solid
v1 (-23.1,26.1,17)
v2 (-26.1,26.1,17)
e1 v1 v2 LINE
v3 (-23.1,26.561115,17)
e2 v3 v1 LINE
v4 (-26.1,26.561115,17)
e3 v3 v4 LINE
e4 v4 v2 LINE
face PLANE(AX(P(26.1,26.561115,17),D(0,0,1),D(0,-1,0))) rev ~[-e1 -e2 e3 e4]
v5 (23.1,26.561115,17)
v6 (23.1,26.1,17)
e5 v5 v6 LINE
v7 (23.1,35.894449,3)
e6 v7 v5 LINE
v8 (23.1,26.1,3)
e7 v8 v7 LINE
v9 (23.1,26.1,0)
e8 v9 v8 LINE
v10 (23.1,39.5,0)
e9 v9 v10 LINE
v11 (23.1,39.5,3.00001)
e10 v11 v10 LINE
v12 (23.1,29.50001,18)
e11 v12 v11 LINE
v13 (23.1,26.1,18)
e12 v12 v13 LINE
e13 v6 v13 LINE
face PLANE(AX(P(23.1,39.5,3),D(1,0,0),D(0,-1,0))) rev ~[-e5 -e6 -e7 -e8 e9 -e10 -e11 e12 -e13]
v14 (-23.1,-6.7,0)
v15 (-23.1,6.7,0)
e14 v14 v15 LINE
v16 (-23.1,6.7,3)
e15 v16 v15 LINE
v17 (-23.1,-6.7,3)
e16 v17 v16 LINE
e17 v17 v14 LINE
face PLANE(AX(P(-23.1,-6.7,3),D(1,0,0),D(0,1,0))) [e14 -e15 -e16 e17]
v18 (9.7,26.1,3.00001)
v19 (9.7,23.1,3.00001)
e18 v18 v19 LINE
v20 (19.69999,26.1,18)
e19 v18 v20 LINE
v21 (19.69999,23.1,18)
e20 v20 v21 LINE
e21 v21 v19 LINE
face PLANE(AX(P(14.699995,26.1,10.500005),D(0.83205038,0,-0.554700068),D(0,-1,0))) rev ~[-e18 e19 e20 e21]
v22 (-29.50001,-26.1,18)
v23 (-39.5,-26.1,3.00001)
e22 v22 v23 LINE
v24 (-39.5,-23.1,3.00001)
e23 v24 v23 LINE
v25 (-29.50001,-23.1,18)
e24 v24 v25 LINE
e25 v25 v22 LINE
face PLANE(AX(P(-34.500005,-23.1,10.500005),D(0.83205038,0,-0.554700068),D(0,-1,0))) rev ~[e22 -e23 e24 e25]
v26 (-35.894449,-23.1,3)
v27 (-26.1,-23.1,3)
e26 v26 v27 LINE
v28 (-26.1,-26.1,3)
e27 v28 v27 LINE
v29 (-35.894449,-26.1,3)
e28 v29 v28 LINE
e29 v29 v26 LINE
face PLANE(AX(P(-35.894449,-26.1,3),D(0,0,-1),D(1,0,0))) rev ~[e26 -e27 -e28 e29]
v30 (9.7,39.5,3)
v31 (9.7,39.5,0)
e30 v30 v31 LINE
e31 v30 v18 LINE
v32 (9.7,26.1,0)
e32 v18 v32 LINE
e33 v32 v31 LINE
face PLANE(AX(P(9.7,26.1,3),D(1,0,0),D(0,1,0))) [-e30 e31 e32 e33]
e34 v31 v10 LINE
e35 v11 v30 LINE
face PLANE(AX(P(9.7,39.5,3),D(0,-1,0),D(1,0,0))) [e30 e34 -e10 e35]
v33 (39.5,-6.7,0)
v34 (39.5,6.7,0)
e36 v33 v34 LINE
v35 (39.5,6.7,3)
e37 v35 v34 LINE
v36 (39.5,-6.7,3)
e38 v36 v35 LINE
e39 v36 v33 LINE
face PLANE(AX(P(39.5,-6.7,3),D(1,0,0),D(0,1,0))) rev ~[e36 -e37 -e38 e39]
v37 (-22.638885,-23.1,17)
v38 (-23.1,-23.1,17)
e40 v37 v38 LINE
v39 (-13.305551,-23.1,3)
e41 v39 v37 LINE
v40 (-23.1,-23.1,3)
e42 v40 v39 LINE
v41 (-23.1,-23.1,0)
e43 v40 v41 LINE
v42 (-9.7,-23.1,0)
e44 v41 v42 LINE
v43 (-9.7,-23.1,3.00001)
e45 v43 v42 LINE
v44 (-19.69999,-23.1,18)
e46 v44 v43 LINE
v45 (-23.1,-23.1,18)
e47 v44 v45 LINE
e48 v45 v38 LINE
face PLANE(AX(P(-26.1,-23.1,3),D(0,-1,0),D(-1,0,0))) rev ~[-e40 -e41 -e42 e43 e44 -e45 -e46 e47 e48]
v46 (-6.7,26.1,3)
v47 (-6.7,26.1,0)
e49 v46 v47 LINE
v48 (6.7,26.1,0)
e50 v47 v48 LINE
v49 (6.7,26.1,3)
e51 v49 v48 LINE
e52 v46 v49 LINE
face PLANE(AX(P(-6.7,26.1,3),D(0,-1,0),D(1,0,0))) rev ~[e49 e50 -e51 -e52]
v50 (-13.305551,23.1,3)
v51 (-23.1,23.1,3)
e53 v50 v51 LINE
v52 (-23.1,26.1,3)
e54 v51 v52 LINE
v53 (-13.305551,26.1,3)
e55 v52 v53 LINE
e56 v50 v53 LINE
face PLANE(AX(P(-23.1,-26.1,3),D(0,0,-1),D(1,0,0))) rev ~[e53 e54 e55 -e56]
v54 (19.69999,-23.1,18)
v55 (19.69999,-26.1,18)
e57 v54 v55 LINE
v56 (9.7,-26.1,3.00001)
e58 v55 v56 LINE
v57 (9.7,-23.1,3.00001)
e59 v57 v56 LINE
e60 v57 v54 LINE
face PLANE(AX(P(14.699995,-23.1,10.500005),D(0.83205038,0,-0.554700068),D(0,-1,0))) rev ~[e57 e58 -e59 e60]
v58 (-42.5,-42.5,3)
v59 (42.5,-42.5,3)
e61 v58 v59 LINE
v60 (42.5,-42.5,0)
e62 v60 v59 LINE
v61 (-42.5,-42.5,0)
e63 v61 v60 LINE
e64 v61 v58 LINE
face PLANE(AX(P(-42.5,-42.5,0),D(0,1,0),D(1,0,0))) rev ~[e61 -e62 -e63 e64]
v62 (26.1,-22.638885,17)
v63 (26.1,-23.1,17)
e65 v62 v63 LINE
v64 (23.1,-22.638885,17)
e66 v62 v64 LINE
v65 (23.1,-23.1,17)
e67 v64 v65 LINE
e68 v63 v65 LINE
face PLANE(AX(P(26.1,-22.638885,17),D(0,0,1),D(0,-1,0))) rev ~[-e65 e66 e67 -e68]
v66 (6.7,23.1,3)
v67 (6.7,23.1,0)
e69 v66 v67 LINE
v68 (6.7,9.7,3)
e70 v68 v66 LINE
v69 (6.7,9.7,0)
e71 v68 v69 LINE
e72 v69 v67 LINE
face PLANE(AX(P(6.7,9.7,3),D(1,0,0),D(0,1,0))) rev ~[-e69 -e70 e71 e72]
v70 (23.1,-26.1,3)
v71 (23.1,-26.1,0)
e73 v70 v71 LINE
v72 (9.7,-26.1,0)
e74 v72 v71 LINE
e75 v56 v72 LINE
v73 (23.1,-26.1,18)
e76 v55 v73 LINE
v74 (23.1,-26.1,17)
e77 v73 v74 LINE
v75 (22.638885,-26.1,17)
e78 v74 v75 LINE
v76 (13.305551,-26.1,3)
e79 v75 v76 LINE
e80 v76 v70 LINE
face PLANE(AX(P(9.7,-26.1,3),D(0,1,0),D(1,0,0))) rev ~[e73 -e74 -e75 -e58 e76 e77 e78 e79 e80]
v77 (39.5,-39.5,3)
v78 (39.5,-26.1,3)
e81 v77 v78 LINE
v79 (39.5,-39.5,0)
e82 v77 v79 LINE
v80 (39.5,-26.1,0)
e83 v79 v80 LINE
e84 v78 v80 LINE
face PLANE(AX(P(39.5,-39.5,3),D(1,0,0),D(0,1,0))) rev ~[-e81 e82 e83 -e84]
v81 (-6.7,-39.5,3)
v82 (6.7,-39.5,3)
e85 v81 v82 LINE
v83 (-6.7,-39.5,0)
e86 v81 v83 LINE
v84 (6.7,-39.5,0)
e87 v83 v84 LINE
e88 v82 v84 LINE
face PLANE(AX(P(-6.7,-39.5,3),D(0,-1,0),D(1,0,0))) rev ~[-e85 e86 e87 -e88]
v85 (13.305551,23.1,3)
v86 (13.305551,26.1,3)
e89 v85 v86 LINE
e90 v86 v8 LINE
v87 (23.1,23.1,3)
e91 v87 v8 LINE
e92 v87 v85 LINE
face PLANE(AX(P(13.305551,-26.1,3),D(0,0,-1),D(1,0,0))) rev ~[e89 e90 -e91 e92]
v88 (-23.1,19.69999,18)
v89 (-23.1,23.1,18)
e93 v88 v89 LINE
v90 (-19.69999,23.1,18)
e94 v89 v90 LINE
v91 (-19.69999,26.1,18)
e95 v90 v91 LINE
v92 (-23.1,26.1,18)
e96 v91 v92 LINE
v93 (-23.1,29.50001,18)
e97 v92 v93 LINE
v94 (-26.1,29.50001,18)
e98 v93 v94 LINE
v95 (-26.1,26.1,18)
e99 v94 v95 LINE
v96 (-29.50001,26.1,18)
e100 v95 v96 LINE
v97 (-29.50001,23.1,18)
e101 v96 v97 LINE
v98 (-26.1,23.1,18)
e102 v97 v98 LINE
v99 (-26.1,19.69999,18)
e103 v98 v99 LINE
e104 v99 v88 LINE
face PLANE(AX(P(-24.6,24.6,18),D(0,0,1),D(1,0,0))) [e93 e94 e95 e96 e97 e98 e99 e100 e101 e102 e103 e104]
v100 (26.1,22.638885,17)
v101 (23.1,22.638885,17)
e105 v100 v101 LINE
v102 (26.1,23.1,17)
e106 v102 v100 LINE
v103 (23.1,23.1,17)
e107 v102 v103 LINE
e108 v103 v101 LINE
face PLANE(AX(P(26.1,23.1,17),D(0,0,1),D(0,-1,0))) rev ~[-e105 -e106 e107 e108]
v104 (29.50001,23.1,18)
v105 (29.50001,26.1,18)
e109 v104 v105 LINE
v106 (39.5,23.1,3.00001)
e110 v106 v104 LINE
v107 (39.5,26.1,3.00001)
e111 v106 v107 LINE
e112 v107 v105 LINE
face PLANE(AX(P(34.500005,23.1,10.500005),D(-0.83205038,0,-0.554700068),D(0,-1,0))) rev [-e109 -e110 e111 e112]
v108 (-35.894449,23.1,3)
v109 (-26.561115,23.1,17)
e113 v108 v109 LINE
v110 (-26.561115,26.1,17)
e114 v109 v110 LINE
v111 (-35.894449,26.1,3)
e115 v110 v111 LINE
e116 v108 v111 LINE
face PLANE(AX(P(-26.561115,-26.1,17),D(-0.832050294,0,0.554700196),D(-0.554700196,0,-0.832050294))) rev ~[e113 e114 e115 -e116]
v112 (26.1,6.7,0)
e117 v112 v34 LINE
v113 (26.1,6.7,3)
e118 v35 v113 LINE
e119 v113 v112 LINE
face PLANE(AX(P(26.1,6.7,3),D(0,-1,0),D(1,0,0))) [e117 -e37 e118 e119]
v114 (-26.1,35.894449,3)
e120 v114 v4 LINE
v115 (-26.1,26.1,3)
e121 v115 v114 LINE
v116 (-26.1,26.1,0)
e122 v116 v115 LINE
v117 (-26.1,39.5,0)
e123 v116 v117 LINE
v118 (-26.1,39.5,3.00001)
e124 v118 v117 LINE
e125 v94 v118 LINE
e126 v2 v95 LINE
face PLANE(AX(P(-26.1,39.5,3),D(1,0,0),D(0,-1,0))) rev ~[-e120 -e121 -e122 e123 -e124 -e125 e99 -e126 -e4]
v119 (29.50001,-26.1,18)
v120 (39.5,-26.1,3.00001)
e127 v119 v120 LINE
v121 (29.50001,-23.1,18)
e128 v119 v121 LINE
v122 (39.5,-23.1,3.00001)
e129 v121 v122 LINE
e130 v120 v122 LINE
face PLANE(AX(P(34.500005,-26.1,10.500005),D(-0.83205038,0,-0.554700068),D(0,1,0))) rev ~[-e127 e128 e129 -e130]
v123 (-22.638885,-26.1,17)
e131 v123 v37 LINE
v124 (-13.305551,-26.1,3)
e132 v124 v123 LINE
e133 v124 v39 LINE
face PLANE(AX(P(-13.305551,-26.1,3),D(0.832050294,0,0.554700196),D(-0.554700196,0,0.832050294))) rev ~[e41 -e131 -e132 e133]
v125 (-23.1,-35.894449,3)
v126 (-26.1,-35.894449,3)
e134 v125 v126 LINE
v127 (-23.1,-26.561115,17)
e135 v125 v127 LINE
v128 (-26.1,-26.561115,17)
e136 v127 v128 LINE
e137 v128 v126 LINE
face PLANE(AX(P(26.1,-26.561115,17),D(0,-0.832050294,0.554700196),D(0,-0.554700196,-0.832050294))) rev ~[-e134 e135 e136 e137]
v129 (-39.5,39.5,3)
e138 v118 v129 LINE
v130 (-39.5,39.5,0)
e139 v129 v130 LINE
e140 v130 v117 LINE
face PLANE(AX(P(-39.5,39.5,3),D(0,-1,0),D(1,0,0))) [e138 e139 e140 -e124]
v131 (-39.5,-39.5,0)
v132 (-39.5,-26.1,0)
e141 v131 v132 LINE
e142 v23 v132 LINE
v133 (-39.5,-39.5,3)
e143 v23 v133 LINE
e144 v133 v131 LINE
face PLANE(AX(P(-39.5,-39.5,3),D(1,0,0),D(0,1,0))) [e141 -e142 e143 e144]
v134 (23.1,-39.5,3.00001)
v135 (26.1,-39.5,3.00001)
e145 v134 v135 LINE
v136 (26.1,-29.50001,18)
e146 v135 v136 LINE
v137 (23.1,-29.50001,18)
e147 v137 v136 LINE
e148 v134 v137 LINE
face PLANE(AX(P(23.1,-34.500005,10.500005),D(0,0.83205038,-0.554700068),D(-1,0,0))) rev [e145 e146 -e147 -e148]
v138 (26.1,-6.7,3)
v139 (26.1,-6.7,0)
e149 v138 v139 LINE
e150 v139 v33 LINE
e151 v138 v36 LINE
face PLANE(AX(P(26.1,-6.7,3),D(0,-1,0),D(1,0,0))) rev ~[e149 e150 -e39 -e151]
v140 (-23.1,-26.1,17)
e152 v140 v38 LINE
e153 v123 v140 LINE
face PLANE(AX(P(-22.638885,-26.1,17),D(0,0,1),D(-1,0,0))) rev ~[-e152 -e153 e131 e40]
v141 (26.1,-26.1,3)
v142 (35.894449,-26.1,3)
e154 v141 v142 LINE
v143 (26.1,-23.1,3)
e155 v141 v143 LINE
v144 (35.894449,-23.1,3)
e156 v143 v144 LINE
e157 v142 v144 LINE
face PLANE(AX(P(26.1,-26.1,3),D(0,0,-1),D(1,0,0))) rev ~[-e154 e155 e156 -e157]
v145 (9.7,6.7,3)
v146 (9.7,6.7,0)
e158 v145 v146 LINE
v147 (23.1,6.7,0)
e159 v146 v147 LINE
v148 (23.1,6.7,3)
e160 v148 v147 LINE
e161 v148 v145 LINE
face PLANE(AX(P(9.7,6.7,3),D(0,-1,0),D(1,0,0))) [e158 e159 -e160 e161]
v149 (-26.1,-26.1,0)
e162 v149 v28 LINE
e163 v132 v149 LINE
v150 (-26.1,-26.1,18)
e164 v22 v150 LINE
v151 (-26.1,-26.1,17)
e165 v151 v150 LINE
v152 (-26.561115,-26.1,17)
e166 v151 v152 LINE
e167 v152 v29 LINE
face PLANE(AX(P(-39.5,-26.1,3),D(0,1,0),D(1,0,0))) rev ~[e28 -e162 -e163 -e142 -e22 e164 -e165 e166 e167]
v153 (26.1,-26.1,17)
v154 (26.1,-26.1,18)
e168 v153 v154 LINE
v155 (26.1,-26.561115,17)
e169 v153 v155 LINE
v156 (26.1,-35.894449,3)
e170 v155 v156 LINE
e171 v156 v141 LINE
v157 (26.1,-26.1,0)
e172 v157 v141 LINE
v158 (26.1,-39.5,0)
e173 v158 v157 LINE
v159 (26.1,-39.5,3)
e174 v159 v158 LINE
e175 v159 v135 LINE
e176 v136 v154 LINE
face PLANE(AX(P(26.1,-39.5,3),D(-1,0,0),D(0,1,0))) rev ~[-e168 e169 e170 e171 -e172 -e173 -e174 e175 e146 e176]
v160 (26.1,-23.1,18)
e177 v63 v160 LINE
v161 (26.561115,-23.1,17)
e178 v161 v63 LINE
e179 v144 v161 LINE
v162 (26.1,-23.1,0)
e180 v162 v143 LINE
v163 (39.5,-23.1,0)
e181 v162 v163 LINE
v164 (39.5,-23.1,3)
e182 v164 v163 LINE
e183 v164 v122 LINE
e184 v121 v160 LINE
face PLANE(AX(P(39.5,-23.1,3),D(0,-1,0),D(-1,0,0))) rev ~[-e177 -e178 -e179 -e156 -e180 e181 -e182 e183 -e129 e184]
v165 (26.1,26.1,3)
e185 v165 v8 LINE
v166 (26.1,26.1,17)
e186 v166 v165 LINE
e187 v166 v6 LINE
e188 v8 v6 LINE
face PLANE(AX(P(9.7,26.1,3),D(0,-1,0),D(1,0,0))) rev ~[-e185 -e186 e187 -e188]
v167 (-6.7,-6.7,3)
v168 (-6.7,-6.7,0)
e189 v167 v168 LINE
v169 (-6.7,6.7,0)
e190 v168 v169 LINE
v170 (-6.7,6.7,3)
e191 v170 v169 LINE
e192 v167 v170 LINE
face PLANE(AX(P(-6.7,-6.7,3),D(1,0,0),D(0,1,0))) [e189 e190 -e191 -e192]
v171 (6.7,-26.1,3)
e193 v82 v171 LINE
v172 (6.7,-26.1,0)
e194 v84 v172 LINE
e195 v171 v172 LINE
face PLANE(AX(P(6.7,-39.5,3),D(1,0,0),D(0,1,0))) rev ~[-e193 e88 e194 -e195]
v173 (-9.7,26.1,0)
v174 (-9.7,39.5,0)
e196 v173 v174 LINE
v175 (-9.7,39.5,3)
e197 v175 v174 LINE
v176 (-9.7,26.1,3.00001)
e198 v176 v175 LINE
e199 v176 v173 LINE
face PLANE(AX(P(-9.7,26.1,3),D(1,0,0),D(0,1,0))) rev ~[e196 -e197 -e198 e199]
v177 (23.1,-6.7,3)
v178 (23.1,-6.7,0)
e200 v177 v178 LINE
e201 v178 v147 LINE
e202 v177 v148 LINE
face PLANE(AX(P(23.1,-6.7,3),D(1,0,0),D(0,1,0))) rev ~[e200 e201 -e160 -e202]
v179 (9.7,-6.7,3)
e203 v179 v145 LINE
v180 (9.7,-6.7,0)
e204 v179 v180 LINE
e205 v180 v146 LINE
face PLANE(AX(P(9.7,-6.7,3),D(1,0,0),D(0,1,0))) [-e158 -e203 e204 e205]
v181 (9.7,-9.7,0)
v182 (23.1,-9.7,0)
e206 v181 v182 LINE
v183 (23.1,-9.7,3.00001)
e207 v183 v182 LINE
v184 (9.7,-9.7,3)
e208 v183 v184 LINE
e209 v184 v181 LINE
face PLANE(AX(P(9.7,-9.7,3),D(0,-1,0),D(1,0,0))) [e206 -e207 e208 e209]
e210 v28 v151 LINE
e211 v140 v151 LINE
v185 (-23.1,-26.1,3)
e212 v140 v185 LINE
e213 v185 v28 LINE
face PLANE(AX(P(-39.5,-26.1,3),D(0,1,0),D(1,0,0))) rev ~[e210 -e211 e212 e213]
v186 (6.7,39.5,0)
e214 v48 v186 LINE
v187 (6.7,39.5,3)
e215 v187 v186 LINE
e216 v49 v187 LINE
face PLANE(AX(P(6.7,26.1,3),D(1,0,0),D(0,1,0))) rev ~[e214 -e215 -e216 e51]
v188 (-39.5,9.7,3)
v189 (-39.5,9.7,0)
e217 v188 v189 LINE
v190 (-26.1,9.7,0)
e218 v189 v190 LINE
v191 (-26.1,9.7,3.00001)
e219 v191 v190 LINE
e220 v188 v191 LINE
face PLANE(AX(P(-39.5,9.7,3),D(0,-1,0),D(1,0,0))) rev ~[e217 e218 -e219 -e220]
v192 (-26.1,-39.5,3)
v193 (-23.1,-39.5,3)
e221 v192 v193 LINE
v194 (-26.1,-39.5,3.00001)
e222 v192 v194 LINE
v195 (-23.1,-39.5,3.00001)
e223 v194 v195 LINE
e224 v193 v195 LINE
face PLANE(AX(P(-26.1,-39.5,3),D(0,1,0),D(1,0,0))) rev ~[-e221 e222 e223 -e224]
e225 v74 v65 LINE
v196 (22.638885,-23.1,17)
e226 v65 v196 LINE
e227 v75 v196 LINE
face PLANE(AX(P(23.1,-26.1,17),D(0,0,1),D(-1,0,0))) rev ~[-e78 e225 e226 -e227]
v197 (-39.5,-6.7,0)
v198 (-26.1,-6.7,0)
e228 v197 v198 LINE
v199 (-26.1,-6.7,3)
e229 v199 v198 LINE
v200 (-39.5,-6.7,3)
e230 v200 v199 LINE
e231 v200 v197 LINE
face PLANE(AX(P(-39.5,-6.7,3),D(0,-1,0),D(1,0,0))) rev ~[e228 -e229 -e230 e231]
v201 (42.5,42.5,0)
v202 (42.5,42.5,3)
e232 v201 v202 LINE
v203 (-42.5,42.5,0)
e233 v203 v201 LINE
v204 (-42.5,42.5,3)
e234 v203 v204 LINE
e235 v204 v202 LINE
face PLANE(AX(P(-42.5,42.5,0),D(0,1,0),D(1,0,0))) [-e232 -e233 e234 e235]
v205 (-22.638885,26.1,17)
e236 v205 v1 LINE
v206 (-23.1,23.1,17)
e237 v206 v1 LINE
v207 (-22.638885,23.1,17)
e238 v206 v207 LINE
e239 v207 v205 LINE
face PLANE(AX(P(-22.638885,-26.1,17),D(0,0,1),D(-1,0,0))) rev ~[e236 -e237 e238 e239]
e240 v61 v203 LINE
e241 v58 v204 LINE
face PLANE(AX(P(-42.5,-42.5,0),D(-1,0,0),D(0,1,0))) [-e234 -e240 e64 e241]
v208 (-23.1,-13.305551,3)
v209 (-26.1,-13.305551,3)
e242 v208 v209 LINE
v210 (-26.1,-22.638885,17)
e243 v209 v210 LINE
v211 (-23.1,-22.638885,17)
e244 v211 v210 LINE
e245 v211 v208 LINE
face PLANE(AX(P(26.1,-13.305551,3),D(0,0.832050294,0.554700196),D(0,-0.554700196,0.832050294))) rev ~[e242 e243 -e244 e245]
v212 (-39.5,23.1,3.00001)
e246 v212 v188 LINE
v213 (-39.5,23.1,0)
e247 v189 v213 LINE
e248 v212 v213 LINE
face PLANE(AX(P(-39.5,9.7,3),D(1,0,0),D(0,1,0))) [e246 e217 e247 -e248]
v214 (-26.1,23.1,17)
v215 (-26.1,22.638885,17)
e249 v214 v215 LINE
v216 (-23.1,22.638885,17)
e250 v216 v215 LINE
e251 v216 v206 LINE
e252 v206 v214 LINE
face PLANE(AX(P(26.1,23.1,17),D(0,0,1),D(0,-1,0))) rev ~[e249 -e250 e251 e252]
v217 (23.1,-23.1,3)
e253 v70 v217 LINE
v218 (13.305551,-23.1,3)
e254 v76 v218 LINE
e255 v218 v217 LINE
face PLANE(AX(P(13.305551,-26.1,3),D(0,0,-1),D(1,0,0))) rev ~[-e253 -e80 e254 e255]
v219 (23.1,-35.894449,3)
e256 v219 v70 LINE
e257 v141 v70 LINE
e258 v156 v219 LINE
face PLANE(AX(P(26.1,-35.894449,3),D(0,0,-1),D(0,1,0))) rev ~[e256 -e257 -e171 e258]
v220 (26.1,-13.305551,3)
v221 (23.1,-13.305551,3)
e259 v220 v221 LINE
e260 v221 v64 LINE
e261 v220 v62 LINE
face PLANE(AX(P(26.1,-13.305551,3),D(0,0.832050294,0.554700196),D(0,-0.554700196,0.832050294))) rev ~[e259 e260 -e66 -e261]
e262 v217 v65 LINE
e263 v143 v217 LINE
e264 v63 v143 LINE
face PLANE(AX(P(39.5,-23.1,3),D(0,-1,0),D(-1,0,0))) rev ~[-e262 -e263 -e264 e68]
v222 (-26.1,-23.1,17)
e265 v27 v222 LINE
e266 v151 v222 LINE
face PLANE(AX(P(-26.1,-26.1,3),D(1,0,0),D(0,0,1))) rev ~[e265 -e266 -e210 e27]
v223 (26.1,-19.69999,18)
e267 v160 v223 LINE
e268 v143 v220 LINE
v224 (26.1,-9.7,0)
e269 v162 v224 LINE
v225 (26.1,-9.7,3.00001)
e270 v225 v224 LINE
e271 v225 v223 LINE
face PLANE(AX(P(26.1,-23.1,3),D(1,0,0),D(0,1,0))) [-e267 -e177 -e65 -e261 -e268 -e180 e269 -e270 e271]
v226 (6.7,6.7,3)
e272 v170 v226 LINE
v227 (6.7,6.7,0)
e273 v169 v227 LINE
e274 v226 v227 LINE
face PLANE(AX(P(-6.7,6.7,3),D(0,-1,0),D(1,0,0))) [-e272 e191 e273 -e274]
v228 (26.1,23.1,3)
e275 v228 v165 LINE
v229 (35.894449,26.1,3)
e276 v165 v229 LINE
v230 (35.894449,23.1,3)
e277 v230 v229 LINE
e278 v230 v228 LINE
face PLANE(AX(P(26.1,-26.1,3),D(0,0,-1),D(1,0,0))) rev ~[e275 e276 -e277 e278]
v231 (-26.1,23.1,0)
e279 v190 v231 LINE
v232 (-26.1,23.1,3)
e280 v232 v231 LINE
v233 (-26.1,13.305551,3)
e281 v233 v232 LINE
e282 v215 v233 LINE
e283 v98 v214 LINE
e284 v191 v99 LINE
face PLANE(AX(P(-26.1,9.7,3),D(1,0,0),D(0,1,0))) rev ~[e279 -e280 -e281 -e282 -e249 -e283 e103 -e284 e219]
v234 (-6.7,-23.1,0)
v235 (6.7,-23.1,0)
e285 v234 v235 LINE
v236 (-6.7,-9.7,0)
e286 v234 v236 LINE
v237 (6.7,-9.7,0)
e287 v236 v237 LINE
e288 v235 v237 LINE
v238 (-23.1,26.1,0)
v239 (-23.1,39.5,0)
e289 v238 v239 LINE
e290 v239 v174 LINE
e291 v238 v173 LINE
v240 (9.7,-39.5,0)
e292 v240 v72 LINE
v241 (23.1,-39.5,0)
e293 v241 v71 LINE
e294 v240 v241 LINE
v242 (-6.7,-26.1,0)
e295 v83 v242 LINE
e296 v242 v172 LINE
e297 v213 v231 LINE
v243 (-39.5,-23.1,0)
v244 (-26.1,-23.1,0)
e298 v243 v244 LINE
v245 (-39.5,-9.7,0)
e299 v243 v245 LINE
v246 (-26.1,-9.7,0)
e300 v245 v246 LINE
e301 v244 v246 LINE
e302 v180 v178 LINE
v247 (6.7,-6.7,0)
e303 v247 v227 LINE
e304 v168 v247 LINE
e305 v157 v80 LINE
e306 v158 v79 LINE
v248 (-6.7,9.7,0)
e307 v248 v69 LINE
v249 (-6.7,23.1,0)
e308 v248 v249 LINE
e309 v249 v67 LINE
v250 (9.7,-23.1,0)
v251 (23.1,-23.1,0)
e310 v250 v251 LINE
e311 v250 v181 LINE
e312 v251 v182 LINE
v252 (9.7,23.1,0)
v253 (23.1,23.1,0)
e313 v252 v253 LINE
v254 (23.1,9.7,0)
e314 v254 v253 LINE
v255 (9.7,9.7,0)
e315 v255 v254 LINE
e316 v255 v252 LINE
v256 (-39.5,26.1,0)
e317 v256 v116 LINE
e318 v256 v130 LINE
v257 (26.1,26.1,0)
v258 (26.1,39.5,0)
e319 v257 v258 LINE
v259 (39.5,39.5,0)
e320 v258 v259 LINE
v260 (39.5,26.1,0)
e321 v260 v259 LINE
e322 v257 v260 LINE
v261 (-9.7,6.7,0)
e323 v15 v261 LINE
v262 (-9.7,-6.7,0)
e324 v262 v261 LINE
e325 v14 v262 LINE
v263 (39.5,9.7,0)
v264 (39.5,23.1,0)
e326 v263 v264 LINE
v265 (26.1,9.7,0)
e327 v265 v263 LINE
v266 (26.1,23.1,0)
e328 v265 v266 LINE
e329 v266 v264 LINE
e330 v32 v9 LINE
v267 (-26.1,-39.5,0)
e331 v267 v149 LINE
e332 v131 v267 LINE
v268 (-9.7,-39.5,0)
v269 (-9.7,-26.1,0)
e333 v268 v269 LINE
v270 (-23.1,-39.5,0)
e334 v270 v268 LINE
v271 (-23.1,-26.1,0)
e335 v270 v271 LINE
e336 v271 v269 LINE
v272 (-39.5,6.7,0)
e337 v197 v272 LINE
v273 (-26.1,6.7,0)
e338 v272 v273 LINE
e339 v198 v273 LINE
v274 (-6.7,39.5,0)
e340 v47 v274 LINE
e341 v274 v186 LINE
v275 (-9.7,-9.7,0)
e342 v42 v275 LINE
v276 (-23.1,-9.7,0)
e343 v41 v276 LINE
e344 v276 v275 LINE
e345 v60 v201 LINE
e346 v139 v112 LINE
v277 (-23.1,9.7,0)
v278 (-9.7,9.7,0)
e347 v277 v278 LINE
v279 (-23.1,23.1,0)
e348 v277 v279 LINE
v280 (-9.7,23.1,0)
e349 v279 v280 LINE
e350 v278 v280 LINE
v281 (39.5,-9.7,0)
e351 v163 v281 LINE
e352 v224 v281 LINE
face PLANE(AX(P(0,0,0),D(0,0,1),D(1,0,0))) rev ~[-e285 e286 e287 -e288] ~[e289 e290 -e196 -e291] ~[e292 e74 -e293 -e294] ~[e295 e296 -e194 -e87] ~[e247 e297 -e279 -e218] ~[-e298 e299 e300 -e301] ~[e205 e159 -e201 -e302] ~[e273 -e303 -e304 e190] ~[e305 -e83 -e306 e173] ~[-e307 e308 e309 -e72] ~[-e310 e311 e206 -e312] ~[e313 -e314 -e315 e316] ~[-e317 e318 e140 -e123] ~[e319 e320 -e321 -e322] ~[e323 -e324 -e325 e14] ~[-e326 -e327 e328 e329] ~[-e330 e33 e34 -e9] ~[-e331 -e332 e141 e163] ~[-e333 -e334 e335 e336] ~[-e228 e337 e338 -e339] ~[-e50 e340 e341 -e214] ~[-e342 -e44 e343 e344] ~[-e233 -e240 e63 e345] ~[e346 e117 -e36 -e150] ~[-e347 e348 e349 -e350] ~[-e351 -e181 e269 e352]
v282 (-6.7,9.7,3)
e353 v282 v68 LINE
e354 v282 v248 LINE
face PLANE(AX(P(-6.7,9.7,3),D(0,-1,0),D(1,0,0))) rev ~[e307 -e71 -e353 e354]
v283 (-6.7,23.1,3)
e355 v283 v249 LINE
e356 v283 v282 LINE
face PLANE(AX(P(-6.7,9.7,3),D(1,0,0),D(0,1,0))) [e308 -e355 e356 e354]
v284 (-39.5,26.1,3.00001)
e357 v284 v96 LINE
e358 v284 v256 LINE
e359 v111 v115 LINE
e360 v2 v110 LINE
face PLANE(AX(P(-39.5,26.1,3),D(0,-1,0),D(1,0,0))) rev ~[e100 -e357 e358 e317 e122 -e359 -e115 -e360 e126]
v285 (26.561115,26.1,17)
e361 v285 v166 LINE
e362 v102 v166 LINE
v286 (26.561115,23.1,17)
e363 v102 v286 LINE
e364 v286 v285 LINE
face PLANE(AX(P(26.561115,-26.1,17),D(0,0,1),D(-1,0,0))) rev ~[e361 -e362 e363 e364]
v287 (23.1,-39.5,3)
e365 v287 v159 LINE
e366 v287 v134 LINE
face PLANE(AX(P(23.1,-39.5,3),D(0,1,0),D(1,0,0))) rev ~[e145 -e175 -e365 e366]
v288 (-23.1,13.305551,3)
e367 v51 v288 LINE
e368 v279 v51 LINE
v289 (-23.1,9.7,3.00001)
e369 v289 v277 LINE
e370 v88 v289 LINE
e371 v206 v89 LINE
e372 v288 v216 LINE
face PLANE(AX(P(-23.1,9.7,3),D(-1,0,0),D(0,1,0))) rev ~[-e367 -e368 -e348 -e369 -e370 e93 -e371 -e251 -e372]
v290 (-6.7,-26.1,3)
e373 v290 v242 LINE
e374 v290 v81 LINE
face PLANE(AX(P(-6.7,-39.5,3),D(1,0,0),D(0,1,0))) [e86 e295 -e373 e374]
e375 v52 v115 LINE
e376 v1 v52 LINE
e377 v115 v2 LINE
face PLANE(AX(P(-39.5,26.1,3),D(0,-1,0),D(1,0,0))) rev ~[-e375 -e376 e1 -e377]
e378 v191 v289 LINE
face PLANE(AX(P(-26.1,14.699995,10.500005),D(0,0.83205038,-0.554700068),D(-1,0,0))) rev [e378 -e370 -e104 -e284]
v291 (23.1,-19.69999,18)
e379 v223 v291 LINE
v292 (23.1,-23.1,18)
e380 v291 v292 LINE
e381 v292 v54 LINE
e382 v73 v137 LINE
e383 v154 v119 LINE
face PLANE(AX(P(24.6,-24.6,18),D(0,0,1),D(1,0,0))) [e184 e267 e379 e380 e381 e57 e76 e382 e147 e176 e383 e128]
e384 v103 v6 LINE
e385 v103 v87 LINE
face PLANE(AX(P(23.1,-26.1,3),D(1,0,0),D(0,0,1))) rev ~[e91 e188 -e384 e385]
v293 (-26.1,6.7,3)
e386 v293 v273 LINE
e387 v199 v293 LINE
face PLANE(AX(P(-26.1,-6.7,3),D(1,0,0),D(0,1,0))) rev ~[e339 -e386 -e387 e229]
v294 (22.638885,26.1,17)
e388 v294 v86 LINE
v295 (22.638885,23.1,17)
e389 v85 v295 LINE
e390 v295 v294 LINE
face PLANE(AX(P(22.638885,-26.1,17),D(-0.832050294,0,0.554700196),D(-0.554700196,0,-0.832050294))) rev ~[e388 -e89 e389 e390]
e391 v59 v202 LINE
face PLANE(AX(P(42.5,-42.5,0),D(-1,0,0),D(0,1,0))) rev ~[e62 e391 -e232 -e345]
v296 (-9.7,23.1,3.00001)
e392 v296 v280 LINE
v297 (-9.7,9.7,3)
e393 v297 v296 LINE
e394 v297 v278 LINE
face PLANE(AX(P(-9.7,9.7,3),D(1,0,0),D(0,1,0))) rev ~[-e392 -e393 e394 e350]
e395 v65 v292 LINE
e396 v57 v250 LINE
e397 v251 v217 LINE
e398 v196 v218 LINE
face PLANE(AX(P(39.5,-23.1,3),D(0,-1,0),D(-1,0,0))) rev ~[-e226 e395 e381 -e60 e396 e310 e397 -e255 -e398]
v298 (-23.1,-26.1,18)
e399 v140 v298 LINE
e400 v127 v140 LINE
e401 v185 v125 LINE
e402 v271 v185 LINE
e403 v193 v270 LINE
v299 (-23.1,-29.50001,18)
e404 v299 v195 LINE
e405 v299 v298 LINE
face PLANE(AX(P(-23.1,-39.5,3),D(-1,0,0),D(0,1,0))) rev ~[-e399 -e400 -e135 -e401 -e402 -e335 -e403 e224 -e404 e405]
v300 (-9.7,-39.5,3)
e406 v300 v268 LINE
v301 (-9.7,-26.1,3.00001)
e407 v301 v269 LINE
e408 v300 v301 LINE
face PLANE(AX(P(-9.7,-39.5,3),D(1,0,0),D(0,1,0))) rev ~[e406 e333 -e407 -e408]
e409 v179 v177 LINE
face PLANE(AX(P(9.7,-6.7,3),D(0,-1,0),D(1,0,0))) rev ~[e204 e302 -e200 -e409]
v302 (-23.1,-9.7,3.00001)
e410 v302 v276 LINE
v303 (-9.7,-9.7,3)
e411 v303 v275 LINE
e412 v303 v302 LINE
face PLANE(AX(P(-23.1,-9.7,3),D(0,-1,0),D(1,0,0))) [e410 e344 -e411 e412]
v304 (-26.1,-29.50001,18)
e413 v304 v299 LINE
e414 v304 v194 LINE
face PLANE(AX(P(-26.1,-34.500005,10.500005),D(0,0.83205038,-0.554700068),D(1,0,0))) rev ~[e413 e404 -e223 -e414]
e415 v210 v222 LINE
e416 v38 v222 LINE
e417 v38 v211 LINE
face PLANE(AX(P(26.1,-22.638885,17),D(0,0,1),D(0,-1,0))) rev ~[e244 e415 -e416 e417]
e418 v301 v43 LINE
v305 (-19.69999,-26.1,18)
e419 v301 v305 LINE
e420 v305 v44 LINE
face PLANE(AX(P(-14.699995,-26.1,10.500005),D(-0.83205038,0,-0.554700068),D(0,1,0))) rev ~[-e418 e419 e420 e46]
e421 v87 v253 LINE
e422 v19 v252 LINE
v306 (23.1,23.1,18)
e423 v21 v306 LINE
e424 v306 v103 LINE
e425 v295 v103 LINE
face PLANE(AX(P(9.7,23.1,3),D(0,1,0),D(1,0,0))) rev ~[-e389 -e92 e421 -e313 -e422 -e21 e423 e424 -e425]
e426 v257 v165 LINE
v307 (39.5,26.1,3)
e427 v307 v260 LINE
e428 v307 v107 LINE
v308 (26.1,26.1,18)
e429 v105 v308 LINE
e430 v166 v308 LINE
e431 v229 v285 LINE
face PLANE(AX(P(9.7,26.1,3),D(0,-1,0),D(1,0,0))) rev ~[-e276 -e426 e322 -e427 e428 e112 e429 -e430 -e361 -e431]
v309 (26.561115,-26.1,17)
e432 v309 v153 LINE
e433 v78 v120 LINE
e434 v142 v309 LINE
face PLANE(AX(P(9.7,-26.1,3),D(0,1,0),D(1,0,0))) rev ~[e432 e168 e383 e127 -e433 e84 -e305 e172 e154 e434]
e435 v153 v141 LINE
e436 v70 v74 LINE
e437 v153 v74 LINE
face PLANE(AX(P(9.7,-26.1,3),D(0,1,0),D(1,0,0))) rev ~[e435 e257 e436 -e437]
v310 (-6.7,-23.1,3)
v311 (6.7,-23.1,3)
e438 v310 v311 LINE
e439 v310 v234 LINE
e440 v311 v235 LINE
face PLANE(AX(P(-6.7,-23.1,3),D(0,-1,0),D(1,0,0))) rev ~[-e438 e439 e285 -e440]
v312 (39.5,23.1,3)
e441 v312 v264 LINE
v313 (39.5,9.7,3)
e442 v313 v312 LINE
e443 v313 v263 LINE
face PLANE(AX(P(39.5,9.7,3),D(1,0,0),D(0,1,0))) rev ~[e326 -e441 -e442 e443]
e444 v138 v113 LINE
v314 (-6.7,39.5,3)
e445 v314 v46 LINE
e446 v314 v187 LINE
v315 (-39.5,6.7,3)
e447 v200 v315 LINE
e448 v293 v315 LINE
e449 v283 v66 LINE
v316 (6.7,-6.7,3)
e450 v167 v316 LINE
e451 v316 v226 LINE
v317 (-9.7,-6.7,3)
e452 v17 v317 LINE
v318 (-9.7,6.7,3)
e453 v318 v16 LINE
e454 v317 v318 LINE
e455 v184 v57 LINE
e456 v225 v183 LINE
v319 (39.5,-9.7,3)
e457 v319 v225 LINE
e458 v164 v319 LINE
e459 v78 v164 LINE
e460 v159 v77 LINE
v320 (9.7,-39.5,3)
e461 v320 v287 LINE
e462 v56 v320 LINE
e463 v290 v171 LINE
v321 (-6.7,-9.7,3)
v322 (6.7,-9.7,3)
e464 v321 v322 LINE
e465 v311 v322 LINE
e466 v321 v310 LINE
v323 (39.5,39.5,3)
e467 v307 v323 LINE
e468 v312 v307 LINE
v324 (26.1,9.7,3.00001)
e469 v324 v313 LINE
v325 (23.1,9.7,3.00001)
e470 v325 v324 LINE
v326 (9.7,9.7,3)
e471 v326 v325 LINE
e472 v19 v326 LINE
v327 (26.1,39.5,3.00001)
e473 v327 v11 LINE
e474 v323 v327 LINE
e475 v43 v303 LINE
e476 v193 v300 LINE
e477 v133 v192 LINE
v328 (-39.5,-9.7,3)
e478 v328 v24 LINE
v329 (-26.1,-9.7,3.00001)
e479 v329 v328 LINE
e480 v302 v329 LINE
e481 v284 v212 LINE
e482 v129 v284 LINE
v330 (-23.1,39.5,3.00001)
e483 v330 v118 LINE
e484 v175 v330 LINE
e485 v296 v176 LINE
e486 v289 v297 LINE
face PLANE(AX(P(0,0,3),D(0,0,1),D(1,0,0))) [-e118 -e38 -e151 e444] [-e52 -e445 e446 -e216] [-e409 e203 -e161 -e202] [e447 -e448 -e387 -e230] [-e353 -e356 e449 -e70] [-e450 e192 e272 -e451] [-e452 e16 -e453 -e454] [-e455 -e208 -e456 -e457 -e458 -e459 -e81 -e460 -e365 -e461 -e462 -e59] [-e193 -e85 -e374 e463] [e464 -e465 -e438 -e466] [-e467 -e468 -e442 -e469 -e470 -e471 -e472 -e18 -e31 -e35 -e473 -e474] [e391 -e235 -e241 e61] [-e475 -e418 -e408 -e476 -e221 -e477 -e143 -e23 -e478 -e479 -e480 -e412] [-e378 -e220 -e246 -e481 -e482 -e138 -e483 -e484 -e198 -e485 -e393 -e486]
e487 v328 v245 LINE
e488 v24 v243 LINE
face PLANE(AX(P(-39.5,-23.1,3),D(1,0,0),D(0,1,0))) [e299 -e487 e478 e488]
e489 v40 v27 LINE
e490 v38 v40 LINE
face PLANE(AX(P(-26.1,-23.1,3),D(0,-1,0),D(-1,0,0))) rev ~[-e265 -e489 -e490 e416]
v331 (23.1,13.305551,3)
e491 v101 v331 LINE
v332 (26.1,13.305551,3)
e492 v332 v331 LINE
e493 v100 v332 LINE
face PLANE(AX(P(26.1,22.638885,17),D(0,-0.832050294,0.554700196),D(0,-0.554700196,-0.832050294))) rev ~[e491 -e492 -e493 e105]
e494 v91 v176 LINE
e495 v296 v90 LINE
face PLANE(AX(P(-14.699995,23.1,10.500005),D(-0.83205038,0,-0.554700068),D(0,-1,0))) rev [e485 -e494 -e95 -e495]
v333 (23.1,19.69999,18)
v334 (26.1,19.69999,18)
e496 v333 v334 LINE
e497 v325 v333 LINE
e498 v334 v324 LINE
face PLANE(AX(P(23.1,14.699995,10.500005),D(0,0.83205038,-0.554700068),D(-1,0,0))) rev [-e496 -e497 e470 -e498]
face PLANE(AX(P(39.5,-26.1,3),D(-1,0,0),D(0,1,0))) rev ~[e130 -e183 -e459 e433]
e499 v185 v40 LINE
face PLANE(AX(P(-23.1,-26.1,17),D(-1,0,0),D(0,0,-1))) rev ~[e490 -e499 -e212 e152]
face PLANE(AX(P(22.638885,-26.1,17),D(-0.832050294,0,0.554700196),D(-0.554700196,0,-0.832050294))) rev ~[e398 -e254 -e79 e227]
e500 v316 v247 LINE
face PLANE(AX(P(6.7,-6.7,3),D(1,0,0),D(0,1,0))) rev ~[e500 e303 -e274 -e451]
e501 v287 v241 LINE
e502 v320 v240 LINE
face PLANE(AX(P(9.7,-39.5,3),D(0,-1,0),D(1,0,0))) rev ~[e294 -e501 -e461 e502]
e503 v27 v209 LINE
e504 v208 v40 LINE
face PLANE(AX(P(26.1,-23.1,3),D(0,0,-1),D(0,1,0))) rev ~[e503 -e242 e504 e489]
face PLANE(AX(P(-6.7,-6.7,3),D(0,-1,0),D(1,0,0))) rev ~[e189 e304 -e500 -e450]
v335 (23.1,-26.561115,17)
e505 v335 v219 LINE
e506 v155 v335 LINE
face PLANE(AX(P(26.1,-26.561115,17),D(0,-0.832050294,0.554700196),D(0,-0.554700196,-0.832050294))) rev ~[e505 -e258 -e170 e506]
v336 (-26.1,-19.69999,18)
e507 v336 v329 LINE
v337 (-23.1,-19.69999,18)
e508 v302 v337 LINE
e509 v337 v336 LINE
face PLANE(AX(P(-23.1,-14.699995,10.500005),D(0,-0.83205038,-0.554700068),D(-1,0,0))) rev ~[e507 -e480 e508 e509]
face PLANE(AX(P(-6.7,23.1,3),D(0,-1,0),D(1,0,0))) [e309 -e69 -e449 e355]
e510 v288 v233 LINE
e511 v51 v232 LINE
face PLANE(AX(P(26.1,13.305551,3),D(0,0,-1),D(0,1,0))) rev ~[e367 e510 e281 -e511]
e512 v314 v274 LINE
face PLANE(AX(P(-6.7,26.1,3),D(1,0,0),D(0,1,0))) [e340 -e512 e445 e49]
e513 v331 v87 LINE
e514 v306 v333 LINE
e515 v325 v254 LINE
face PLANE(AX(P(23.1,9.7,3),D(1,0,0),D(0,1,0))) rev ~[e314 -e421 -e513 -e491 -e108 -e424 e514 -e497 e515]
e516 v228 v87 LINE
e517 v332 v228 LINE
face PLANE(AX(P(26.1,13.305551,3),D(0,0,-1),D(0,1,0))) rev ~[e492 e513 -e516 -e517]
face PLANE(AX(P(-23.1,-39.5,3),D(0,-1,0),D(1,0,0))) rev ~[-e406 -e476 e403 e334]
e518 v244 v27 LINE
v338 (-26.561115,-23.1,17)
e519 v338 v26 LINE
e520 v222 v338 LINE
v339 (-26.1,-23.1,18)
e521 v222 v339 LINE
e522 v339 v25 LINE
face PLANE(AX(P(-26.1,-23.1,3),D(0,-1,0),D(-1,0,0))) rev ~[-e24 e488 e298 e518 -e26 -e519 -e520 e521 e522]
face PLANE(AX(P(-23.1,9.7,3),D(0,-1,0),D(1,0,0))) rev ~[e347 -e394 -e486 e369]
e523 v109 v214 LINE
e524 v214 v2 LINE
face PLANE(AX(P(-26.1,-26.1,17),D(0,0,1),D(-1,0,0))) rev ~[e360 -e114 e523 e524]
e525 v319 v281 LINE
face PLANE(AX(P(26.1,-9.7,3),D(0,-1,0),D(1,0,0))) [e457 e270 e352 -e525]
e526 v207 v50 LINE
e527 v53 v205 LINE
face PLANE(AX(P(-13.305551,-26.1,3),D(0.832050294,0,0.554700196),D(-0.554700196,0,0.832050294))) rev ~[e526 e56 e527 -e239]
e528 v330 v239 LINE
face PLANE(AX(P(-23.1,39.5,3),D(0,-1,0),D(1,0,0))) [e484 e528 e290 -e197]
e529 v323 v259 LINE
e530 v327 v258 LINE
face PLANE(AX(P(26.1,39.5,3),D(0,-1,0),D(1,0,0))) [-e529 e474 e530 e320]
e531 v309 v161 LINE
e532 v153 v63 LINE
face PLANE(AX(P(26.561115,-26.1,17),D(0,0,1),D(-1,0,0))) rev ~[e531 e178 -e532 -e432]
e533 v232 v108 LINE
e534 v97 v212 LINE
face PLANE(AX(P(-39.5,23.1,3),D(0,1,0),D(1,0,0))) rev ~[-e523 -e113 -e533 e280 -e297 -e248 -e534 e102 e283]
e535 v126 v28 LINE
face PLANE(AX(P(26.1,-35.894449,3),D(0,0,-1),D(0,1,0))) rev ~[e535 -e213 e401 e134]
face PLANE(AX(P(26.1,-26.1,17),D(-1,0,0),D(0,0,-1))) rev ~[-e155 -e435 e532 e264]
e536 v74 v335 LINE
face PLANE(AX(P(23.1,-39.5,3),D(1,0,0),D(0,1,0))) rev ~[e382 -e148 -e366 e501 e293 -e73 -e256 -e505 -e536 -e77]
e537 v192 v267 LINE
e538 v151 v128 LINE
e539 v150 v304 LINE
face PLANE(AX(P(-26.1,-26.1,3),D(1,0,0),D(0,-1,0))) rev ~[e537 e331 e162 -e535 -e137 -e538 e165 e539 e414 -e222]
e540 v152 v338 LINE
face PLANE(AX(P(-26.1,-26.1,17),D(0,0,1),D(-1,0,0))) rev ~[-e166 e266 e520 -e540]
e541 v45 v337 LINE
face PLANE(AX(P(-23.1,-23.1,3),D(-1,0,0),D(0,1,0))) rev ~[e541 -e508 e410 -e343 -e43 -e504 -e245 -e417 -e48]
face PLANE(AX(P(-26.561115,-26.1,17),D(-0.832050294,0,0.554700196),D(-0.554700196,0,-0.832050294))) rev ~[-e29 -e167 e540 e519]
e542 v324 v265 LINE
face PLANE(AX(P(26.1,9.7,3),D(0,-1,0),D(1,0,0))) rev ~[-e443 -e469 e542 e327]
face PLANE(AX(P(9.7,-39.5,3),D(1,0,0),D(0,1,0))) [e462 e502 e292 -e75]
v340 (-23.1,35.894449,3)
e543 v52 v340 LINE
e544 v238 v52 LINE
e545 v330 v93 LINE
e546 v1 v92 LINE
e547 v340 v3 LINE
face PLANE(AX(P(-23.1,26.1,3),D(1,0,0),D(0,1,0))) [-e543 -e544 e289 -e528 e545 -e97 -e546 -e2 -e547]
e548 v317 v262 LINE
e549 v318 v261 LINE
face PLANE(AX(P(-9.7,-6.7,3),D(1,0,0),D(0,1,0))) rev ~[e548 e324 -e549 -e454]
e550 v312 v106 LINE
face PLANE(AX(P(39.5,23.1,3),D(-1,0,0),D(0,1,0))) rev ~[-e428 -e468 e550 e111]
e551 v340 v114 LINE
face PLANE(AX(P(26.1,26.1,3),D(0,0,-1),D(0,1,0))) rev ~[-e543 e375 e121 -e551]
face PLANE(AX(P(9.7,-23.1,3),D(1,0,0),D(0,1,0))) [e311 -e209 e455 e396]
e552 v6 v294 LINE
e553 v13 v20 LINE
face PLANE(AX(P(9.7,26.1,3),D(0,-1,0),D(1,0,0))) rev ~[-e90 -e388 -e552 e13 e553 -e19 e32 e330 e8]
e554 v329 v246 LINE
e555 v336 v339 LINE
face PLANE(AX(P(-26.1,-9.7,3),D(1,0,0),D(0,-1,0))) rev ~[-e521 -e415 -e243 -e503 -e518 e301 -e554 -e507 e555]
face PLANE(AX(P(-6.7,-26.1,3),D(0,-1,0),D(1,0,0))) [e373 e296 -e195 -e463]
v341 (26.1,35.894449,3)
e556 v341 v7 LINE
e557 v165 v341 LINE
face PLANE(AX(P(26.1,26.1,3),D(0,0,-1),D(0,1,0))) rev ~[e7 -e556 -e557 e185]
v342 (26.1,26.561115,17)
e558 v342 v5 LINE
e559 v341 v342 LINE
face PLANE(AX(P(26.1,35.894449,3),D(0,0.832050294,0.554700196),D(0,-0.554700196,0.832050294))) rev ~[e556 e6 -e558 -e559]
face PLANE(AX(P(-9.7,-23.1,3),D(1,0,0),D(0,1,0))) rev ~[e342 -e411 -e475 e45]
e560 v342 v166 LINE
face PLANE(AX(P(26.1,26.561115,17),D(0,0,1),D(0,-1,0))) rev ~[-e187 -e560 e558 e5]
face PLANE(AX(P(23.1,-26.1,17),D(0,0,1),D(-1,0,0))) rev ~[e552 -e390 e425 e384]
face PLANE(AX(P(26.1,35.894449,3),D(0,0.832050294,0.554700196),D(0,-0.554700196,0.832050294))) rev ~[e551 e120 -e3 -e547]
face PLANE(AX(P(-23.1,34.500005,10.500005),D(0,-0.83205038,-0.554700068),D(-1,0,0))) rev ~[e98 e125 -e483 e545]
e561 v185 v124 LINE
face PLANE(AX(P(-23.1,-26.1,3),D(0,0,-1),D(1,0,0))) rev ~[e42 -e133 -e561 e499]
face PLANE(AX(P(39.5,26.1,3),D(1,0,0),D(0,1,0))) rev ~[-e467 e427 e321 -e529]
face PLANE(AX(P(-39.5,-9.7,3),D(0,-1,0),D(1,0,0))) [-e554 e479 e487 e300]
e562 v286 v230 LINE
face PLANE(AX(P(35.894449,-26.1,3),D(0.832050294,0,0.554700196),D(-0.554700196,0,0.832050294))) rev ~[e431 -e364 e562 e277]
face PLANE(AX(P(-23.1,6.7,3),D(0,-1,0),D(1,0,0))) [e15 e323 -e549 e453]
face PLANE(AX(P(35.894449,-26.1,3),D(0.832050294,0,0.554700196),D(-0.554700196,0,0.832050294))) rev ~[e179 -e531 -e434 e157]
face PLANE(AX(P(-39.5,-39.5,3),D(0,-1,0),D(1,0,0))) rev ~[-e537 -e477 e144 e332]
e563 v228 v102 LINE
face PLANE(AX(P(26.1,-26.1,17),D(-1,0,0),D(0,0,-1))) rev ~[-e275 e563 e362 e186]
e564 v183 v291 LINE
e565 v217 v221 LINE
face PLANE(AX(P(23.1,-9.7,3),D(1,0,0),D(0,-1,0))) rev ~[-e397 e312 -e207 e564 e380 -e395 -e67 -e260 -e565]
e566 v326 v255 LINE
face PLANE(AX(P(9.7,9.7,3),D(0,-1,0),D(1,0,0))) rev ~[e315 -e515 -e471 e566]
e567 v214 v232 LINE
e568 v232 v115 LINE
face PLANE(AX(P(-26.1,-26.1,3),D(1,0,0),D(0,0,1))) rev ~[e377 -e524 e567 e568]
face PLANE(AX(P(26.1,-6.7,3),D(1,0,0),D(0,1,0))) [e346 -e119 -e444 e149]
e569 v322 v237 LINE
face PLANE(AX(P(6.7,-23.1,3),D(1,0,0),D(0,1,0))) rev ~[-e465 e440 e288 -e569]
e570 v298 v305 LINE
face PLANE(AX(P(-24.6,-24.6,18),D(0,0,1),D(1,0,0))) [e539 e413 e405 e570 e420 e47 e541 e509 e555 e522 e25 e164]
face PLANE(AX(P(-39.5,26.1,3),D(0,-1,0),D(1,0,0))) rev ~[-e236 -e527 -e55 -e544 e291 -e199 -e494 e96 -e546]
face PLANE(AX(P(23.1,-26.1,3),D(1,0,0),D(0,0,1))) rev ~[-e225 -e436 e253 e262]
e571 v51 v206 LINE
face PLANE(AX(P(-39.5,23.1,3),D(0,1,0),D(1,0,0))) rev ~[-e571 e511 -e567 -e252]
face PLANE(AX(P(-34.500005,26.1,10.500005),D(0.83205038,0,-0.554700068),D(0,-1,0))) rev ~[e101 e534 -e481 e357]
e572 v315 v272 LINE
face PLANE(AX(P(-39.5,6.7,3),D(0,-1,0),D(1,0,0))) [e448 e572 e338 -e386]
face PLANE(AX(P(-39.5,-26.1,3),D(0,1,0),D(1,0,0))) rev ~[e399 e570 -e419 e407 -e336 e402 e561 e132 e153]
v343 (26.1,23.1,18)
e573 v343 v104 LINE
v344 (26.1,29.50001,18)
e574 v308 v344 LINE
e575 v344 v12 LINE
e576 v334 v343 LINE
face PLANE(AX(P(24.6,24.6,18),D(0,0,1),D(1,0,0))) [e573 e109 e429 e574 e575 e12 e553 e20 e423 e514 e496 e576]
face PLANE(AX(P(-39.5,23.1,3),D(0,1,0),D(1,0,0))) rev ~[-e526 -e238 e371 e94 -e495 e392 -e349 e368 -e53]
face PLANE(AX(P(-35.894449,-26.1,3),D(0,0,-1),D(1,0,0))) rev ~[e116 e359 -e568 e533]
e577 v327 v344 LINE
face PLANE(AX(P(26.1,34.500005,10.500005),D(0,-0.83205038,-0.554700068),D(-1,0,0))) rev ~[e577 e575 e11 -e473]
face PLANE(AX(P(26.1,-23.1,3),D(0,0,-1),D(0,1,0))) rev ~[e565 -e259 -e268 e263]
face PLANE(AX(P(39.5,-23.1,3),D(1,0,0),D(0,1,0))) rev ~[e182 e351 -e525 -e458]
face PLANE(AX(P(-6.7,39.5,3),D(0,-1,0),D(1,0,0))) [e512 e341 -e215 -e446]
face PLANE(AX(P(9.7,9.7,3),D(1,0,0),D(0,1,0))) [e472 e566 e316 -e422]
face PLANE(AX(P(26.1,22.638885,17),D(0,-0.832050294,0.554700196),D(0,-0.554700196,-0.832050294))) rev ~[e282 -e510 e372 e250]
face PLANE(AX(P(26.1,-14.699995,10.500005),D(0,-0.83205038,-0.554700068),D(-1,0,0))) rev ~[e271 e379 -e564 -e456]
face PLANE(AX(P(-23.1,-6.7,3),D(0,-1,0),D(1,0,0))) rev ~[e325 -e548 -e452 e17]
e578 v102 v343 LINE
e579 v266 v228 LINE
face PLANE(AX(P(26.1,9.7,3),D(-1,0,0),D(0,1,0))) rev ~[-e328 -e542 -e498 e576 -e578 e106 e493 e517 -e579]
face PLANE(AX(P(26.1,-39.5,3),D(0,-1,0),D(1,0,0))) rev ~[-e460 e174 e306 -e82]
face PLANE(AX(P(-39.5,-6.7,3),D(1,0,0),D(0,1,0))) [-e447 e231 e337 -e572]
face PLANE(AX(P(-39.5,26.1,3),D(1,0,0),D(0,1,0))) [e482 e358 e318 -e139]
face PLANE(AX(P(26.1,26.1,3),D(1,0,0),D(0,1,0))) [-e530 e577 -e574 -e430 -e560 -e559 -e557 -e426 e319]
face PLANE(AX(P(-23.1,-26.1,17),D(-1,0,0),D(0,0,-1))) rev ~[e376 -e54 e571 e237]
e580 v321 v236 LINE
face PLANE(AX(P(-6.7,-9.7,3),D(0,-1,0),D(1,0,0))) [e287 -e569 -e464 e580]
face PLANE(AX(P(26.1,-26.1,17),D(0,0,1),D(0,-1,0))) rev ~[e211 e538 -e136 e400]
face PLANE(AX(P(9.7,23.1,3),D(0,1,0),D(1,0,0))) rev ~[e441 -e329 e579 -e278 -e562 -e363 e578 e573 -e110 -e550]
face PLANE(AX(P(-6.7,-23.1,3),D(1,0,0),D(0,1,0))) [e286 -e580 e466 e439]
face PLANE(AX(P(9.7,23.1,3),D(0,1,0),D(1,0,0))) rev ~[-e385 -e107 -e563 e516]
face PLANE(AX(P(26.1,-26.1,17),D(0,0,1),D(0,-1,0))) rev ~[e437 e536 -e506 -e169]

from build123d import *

# Parameters (mm, degrees)
F0_W       = 85
F0_H       = 85
F1_DEPTH   = 3
F2_W       = 13.4
F2_H       = 13.4
F3_DEPTH   = 25
F5_DEPTH   = 15
F6_SIZE2   = 14.99999
F6_SIZE    = 9.99999
F6_2_SIZE2 = 14.99999
F6_2_SIZE  = 9.99999
F6_3_SIZE2 = 14.99999
F6_3_SIZE  = 9.99999
F6_4_SIZE2 = 14.99999
F6_4_SIZE  = 9.99999
F7_SIZE2   = 9.99999
F7_SIZE    = 14.99999
F7_2_SIZE2 = 9.99999
F7_2_SIZE  = 14.99999
F7_3_SIZE2 = 9.99999
F7_3_SIZE  = 14.99999
F7_4_SIZE2 = 9.99999
F7_4_SIZE  = 14.99999
F7_5_SIZE2 = 9.99999
F7_5_SIZE  = 14.99999
F9_DEPTH   = 68.601
F11_DEPTH  = 68.601


# Not quite as in the source:
# - a fillet or chamfer is up to 0.001 mm smaller than in the source, because OpenCascade refuses the exact size
# - a feature names something its author has since deleted; it is built from what else it names


with BuildPart() as f1:
    # F0 (on Top) → F1 (new body)
    with BuildSketch(Plane.XY):
        Rectangle(F0_W, F0_H)
    extrude(amount=F1_DEPTH)

    # F2 (on face) → F3 (cut)
    with BuildSketch(Plane.XY.offset(3)):
        with Locations((-32.8, 16.4)):
            Rectangle(F2_W, F2_H)
        with Locations((-32.8, 0)):
            Rectangle(F2_W, F2_H)
        with Locations((-32.8, -16.4)):
            Rectangle(F2_W, F2_H)
        with Locations((-32.8, -32.8)):
            Rectangle(F2_W, F2_H)
        with Locations((-16.4, 32.8)):
            Rectangle(F2_W, F2_H)
        with Locations((-16.4, 16.4)):
            Rectangle(F2_W, F2_H)
        with Locations((-16.4, 0)):
            Rectangle(F2_W, F2_H)
        with Locations((-16.4, -16.4)):
            Rectangle(F2_W, F2_H)
        with Locations((-16.4, -32.8)):
            Rectangle(F2_W, F2_H)
        with Locations((0, 32.8)):
            Rectangle(F2_W, F2_H)
        with Locations((0, 16.4)):
            Rectangle(F2_W, F2_H)
        Rectangle(F2_W, F2_H)
        with Locations((0, -16.4)):
            Rectangle(F2_W, F2_H)
        with Locations((0, -32.8)):
            Rectangle(F2_W, F2_H)
        with Locations((16.4, 32.8)):
            Rectangle(F2_W, F2_H)
        with Locations((16.4, 16.4)):
            Rectangle(F2_W, F2_H)
        with Locations((16.4, 0)):
            Rectangle(F2_W, F2_H)
        with Locations((16.4, -16.4)):
            Rectangle(F2_W, F2_H)
        with Locations((16.4, -32.8)):
            Rectangle(F2_W, F2_H)
        with Locations((32.8, 32.8)):
            Rectangle(F2_W, F2_H)
        with Locations((32.8, 16.4)):
            Rectangle(F2_W, F2_H)
        with Locations((32.8, 0)):
            Rectangle(F2_W, F2_H)
        with Locations((32.8, -16.4)):
            Rectangle(F2_W, F2_H)
        with Locations((32.8, -32.8)):
            Rectangle(F2_W, F2_H)
        with Locations((-32.8, 32.8)):
            Rectangle(F2_W, F2_H)
    extrude(amount=-F3_DEPTH, mode=Mode.SUBTRACT)

    # F4 (on face) → F5 (join)
    with BuildSketch(Plane.XY.offset(3)):
        Polygon((-23.1, -9.7), (-26.1, -9.7), (-26.1, -23.1), (-39.5, -23.1), (-39.5, -26.1), (-26.1, -26.1), (-26.1, -39.5), (-23.1, -39.5), (-23.1, -26.1), (-9.7, -26.1), (-9.7, -23.1), (-23.1, -23.1), align=None)
        Polygon((-9.7, 23.1), (-9.7, 26.1), (-23.1, 26.1), (-23.1, 39.5), (-26.1, 39.5), (-26.1, 26.1), (-39.5, 26.1), (-39.5, 23.1), (-26.1, 23.1), (-26.1, 9.7), (-23.1, 9.7), (-23.1, 23.1), align=None)
        Polygon((26.1, 26.1), (26.1, 39.5), (23.1, 39.5), (23.1, 26.1), (9.7, 26.1), (9.7, 23.1), (23.1, 23.1), (23.1, 9.7), (26.1, 9.7), (26.1, 23.1), (39.5, 23.1), (39.5, 26.1), align=None)
        Polygon((26.1, -23.1), (26.1, -9.7), (23.1, -9.7), (23.1, -23.1), (9.7, -23.1), (9.7, -26.1), (23.1, -26.1), (23.1, -39.5), (26.1, -39.5), (26.1, -26.1), (39.5, -26.1), (39.5, -23.1), align=None)
    extrude(amount=F5_DEPTH)

    # F6 (size 10 and 15 in the source; OpenCascade refuses exactly that, so slightly less here)
    f6_edges = [f1.edges().sort_by_distance(p)[0] for p in [
        (-39.5, -24.6, 18),
        (-24.6, -9.7, 18),
        (-9.7, -24.6, 18),
        (-24.6, -39.5, 18),
    ]]
    f6_side = f1.faces().sort_by_distance((-24.6, -24.6, 18))[0]
    chamfer(f6_edges, length=F6_SIZE, length2=F6_SIZE2, reference=f6_side)

    # F6#2 (size 10 and 15 in the source; OpenCascade refuses exactly that, so slightly less here)
    f6_2_edges = [f1.edges().sort_by_distance(p)[0] for p in [
        (-39.5, 24.6, 18),
        (-24.6, 39.5, 18),
    ]]
    f6_2_side = f1.faces().sort_by_distance((-24.6, 24.6, 18))[0]
    chamfer(f6_2_edges, length=F6_2_SIZE, length2=F6_2_SIZE2, reference=f6_2_side)

    # F6#3 (size 10 and 15 in the source; OpenCascade refuses exactly that, so slightly less here)
    f6_3_edges = [f1.edges().sort_by_distance(p)[0] for p in [
        (9.7, 24.6, 18),
        (24.6, 39.5, 18),
    ]]
    f6_3_side = f1.faces().sort_by_distance((24.6, 24.6, 18))[0]
    chamfer(f6_3_edges, length=F6_3_SIZE, length2=F6_3_SIZE2, reference=f6_3_side)

    # F6#4 (size 10 and 15 in the source; OpenCascade refuses exactly that, so slightly less here)
    f6_4_edges = [f1.edges().sort_by_distance(p)[0] for p in [
        (24.6, -9.7, 18),
        (9.7, -24.6, 18),
        (39.5, -24.6, 18),
    ]]
    f6_4_side = f1.faces().sort_by_distance((24.6, -24.6, 18))[0]
    chamfer(f6_4_edges, length=F6_4_SIZE, length2=F6_4_SIZE2, reference=f6_4_side)

    # F7 (size 15 and 10 in the source; OpenCascade refuses exactly that, so slightly less here)
    f7_edges = [f1.edges().sort_by_distance(p)[0] for p in [
        (-9.7, 24.6, 18),
    ]]
    f7_side = f1.faces().sort_by_distance((-9.7, 24.6, 10.5))[0]
    chamfer(f7_edges, length=F7_SIZE, length2=F7_SIZE2, reference=f7_side)

    # F7#2 (size 15 and 10 in the source; OpenCascade refuses exactly that, so slightly less here)
    f7_2_edges = [f1.edges().sort_by_distance(p)[0] for p in [
        (-24.6, 9.7, 18),
    ]]
    f7_2_side = f1.faces().sort_by_distance((-24.6, 9.7, 10.5))[0]
    chamfer(f7_2_edges, length=F7_2_SIZE, length2=F7_2_SIZE2, reference=f7_2_side)

    # F7#3 (size 15 and 10 in the source; OpenCascade refuses exactly that, so slightly less here)
    f7_3_edges = [f1.edges().sort_by_distance(p)[0] for p in [
        (24.6, 9.7, 18),
    ]]
    f7_3_side = f1.faces().sort_by_distance((24.6, 9.7, 10.5))[0]
    chamfer(f7_3_edges, length=F7_3_SIZE, length2=F7_3_SIZE2, reference=f7_3_side)

    # F7#4 (size 15 and 10 in the source; OpenCascade refuses exactly that, so slightly less here)
    f7_4_edges = [f1.edges().sort_by_distance(p)[0] for p in [
        (39.5, 24.6, 18),
    ]]
    f7_4_side = f1.faces().sort_by_distance((39.5, 24.6, 10.5))[0]
    chamfer(f7_4_edges, length=F7_4_SIZE, length2=F7_4_SIZE2, reference=f7_4_side)

    # F7#5 (size 15 and 10 in the source; OpenCascade refuses exactly that, so slightly less here)
    f7_5_edges = [f1.edges().sort_by_distance(p)[0] for p in [
        (24.6, -39.5, 18),
    ]]
    f7_5_side = f1.faces().sort_by_distance((24.6, -39.5, 10.5))[0]
    chamfer(f7_5_edges, length=F7_5_SIZE, length2=F7_5_SIZE2, reference=f7_5_side)

    # F8 (on face) → F9 (cut, through all)
    with BuildSketch(Plane.YZ.offset(26.1)):
        Polygon((-26.1, 17), (-26.5611153912, 17), (-35.8944487245, 3), (-26.1, 3), align=None)
        Polygon((-22.6388846088, 17), (-23.1, 17), (-23.1, 3), (-13.3055512755, 3), align=None)
        Polygon((23.1, 17), (22.6388846088, 17), (13.3055512755, 3), (23.1, 3), align=None)
        Polygon((26.5611153912, 17), (26.1, 17), (26.1, 3), (35.8944487245, 3), align=None)
    extrude(amount=-F9_DEPTH, mode=Mode.SUBTRACT)

    # F10 (on face) → F11 (cut, through all)
    with BuildSketch(Plane.XZ.offset(26.1)):
        Polygon((-26.1, 17), (-26.5611153912, 17), (-35.8944487245, 3), (-26.1, 3), align=None)
        Polygon((-22.6388846088, 17), (-23.1, 17), (-23.1, 3), (-13.3055512755, 3), align=None)
        Polygon((23.1, 17), (22.6388846088, 17), (13.3055512755, 3), (23.1, 3), align=None)
        Polygon((26.5611153912, 17), (26.1, 17), (26.1, 3), (35.8944487245, 3), align=None)
    extrude(amount=-F11_DEPTH, mode=Mode.SUBTRACT)


solid = f1.part
